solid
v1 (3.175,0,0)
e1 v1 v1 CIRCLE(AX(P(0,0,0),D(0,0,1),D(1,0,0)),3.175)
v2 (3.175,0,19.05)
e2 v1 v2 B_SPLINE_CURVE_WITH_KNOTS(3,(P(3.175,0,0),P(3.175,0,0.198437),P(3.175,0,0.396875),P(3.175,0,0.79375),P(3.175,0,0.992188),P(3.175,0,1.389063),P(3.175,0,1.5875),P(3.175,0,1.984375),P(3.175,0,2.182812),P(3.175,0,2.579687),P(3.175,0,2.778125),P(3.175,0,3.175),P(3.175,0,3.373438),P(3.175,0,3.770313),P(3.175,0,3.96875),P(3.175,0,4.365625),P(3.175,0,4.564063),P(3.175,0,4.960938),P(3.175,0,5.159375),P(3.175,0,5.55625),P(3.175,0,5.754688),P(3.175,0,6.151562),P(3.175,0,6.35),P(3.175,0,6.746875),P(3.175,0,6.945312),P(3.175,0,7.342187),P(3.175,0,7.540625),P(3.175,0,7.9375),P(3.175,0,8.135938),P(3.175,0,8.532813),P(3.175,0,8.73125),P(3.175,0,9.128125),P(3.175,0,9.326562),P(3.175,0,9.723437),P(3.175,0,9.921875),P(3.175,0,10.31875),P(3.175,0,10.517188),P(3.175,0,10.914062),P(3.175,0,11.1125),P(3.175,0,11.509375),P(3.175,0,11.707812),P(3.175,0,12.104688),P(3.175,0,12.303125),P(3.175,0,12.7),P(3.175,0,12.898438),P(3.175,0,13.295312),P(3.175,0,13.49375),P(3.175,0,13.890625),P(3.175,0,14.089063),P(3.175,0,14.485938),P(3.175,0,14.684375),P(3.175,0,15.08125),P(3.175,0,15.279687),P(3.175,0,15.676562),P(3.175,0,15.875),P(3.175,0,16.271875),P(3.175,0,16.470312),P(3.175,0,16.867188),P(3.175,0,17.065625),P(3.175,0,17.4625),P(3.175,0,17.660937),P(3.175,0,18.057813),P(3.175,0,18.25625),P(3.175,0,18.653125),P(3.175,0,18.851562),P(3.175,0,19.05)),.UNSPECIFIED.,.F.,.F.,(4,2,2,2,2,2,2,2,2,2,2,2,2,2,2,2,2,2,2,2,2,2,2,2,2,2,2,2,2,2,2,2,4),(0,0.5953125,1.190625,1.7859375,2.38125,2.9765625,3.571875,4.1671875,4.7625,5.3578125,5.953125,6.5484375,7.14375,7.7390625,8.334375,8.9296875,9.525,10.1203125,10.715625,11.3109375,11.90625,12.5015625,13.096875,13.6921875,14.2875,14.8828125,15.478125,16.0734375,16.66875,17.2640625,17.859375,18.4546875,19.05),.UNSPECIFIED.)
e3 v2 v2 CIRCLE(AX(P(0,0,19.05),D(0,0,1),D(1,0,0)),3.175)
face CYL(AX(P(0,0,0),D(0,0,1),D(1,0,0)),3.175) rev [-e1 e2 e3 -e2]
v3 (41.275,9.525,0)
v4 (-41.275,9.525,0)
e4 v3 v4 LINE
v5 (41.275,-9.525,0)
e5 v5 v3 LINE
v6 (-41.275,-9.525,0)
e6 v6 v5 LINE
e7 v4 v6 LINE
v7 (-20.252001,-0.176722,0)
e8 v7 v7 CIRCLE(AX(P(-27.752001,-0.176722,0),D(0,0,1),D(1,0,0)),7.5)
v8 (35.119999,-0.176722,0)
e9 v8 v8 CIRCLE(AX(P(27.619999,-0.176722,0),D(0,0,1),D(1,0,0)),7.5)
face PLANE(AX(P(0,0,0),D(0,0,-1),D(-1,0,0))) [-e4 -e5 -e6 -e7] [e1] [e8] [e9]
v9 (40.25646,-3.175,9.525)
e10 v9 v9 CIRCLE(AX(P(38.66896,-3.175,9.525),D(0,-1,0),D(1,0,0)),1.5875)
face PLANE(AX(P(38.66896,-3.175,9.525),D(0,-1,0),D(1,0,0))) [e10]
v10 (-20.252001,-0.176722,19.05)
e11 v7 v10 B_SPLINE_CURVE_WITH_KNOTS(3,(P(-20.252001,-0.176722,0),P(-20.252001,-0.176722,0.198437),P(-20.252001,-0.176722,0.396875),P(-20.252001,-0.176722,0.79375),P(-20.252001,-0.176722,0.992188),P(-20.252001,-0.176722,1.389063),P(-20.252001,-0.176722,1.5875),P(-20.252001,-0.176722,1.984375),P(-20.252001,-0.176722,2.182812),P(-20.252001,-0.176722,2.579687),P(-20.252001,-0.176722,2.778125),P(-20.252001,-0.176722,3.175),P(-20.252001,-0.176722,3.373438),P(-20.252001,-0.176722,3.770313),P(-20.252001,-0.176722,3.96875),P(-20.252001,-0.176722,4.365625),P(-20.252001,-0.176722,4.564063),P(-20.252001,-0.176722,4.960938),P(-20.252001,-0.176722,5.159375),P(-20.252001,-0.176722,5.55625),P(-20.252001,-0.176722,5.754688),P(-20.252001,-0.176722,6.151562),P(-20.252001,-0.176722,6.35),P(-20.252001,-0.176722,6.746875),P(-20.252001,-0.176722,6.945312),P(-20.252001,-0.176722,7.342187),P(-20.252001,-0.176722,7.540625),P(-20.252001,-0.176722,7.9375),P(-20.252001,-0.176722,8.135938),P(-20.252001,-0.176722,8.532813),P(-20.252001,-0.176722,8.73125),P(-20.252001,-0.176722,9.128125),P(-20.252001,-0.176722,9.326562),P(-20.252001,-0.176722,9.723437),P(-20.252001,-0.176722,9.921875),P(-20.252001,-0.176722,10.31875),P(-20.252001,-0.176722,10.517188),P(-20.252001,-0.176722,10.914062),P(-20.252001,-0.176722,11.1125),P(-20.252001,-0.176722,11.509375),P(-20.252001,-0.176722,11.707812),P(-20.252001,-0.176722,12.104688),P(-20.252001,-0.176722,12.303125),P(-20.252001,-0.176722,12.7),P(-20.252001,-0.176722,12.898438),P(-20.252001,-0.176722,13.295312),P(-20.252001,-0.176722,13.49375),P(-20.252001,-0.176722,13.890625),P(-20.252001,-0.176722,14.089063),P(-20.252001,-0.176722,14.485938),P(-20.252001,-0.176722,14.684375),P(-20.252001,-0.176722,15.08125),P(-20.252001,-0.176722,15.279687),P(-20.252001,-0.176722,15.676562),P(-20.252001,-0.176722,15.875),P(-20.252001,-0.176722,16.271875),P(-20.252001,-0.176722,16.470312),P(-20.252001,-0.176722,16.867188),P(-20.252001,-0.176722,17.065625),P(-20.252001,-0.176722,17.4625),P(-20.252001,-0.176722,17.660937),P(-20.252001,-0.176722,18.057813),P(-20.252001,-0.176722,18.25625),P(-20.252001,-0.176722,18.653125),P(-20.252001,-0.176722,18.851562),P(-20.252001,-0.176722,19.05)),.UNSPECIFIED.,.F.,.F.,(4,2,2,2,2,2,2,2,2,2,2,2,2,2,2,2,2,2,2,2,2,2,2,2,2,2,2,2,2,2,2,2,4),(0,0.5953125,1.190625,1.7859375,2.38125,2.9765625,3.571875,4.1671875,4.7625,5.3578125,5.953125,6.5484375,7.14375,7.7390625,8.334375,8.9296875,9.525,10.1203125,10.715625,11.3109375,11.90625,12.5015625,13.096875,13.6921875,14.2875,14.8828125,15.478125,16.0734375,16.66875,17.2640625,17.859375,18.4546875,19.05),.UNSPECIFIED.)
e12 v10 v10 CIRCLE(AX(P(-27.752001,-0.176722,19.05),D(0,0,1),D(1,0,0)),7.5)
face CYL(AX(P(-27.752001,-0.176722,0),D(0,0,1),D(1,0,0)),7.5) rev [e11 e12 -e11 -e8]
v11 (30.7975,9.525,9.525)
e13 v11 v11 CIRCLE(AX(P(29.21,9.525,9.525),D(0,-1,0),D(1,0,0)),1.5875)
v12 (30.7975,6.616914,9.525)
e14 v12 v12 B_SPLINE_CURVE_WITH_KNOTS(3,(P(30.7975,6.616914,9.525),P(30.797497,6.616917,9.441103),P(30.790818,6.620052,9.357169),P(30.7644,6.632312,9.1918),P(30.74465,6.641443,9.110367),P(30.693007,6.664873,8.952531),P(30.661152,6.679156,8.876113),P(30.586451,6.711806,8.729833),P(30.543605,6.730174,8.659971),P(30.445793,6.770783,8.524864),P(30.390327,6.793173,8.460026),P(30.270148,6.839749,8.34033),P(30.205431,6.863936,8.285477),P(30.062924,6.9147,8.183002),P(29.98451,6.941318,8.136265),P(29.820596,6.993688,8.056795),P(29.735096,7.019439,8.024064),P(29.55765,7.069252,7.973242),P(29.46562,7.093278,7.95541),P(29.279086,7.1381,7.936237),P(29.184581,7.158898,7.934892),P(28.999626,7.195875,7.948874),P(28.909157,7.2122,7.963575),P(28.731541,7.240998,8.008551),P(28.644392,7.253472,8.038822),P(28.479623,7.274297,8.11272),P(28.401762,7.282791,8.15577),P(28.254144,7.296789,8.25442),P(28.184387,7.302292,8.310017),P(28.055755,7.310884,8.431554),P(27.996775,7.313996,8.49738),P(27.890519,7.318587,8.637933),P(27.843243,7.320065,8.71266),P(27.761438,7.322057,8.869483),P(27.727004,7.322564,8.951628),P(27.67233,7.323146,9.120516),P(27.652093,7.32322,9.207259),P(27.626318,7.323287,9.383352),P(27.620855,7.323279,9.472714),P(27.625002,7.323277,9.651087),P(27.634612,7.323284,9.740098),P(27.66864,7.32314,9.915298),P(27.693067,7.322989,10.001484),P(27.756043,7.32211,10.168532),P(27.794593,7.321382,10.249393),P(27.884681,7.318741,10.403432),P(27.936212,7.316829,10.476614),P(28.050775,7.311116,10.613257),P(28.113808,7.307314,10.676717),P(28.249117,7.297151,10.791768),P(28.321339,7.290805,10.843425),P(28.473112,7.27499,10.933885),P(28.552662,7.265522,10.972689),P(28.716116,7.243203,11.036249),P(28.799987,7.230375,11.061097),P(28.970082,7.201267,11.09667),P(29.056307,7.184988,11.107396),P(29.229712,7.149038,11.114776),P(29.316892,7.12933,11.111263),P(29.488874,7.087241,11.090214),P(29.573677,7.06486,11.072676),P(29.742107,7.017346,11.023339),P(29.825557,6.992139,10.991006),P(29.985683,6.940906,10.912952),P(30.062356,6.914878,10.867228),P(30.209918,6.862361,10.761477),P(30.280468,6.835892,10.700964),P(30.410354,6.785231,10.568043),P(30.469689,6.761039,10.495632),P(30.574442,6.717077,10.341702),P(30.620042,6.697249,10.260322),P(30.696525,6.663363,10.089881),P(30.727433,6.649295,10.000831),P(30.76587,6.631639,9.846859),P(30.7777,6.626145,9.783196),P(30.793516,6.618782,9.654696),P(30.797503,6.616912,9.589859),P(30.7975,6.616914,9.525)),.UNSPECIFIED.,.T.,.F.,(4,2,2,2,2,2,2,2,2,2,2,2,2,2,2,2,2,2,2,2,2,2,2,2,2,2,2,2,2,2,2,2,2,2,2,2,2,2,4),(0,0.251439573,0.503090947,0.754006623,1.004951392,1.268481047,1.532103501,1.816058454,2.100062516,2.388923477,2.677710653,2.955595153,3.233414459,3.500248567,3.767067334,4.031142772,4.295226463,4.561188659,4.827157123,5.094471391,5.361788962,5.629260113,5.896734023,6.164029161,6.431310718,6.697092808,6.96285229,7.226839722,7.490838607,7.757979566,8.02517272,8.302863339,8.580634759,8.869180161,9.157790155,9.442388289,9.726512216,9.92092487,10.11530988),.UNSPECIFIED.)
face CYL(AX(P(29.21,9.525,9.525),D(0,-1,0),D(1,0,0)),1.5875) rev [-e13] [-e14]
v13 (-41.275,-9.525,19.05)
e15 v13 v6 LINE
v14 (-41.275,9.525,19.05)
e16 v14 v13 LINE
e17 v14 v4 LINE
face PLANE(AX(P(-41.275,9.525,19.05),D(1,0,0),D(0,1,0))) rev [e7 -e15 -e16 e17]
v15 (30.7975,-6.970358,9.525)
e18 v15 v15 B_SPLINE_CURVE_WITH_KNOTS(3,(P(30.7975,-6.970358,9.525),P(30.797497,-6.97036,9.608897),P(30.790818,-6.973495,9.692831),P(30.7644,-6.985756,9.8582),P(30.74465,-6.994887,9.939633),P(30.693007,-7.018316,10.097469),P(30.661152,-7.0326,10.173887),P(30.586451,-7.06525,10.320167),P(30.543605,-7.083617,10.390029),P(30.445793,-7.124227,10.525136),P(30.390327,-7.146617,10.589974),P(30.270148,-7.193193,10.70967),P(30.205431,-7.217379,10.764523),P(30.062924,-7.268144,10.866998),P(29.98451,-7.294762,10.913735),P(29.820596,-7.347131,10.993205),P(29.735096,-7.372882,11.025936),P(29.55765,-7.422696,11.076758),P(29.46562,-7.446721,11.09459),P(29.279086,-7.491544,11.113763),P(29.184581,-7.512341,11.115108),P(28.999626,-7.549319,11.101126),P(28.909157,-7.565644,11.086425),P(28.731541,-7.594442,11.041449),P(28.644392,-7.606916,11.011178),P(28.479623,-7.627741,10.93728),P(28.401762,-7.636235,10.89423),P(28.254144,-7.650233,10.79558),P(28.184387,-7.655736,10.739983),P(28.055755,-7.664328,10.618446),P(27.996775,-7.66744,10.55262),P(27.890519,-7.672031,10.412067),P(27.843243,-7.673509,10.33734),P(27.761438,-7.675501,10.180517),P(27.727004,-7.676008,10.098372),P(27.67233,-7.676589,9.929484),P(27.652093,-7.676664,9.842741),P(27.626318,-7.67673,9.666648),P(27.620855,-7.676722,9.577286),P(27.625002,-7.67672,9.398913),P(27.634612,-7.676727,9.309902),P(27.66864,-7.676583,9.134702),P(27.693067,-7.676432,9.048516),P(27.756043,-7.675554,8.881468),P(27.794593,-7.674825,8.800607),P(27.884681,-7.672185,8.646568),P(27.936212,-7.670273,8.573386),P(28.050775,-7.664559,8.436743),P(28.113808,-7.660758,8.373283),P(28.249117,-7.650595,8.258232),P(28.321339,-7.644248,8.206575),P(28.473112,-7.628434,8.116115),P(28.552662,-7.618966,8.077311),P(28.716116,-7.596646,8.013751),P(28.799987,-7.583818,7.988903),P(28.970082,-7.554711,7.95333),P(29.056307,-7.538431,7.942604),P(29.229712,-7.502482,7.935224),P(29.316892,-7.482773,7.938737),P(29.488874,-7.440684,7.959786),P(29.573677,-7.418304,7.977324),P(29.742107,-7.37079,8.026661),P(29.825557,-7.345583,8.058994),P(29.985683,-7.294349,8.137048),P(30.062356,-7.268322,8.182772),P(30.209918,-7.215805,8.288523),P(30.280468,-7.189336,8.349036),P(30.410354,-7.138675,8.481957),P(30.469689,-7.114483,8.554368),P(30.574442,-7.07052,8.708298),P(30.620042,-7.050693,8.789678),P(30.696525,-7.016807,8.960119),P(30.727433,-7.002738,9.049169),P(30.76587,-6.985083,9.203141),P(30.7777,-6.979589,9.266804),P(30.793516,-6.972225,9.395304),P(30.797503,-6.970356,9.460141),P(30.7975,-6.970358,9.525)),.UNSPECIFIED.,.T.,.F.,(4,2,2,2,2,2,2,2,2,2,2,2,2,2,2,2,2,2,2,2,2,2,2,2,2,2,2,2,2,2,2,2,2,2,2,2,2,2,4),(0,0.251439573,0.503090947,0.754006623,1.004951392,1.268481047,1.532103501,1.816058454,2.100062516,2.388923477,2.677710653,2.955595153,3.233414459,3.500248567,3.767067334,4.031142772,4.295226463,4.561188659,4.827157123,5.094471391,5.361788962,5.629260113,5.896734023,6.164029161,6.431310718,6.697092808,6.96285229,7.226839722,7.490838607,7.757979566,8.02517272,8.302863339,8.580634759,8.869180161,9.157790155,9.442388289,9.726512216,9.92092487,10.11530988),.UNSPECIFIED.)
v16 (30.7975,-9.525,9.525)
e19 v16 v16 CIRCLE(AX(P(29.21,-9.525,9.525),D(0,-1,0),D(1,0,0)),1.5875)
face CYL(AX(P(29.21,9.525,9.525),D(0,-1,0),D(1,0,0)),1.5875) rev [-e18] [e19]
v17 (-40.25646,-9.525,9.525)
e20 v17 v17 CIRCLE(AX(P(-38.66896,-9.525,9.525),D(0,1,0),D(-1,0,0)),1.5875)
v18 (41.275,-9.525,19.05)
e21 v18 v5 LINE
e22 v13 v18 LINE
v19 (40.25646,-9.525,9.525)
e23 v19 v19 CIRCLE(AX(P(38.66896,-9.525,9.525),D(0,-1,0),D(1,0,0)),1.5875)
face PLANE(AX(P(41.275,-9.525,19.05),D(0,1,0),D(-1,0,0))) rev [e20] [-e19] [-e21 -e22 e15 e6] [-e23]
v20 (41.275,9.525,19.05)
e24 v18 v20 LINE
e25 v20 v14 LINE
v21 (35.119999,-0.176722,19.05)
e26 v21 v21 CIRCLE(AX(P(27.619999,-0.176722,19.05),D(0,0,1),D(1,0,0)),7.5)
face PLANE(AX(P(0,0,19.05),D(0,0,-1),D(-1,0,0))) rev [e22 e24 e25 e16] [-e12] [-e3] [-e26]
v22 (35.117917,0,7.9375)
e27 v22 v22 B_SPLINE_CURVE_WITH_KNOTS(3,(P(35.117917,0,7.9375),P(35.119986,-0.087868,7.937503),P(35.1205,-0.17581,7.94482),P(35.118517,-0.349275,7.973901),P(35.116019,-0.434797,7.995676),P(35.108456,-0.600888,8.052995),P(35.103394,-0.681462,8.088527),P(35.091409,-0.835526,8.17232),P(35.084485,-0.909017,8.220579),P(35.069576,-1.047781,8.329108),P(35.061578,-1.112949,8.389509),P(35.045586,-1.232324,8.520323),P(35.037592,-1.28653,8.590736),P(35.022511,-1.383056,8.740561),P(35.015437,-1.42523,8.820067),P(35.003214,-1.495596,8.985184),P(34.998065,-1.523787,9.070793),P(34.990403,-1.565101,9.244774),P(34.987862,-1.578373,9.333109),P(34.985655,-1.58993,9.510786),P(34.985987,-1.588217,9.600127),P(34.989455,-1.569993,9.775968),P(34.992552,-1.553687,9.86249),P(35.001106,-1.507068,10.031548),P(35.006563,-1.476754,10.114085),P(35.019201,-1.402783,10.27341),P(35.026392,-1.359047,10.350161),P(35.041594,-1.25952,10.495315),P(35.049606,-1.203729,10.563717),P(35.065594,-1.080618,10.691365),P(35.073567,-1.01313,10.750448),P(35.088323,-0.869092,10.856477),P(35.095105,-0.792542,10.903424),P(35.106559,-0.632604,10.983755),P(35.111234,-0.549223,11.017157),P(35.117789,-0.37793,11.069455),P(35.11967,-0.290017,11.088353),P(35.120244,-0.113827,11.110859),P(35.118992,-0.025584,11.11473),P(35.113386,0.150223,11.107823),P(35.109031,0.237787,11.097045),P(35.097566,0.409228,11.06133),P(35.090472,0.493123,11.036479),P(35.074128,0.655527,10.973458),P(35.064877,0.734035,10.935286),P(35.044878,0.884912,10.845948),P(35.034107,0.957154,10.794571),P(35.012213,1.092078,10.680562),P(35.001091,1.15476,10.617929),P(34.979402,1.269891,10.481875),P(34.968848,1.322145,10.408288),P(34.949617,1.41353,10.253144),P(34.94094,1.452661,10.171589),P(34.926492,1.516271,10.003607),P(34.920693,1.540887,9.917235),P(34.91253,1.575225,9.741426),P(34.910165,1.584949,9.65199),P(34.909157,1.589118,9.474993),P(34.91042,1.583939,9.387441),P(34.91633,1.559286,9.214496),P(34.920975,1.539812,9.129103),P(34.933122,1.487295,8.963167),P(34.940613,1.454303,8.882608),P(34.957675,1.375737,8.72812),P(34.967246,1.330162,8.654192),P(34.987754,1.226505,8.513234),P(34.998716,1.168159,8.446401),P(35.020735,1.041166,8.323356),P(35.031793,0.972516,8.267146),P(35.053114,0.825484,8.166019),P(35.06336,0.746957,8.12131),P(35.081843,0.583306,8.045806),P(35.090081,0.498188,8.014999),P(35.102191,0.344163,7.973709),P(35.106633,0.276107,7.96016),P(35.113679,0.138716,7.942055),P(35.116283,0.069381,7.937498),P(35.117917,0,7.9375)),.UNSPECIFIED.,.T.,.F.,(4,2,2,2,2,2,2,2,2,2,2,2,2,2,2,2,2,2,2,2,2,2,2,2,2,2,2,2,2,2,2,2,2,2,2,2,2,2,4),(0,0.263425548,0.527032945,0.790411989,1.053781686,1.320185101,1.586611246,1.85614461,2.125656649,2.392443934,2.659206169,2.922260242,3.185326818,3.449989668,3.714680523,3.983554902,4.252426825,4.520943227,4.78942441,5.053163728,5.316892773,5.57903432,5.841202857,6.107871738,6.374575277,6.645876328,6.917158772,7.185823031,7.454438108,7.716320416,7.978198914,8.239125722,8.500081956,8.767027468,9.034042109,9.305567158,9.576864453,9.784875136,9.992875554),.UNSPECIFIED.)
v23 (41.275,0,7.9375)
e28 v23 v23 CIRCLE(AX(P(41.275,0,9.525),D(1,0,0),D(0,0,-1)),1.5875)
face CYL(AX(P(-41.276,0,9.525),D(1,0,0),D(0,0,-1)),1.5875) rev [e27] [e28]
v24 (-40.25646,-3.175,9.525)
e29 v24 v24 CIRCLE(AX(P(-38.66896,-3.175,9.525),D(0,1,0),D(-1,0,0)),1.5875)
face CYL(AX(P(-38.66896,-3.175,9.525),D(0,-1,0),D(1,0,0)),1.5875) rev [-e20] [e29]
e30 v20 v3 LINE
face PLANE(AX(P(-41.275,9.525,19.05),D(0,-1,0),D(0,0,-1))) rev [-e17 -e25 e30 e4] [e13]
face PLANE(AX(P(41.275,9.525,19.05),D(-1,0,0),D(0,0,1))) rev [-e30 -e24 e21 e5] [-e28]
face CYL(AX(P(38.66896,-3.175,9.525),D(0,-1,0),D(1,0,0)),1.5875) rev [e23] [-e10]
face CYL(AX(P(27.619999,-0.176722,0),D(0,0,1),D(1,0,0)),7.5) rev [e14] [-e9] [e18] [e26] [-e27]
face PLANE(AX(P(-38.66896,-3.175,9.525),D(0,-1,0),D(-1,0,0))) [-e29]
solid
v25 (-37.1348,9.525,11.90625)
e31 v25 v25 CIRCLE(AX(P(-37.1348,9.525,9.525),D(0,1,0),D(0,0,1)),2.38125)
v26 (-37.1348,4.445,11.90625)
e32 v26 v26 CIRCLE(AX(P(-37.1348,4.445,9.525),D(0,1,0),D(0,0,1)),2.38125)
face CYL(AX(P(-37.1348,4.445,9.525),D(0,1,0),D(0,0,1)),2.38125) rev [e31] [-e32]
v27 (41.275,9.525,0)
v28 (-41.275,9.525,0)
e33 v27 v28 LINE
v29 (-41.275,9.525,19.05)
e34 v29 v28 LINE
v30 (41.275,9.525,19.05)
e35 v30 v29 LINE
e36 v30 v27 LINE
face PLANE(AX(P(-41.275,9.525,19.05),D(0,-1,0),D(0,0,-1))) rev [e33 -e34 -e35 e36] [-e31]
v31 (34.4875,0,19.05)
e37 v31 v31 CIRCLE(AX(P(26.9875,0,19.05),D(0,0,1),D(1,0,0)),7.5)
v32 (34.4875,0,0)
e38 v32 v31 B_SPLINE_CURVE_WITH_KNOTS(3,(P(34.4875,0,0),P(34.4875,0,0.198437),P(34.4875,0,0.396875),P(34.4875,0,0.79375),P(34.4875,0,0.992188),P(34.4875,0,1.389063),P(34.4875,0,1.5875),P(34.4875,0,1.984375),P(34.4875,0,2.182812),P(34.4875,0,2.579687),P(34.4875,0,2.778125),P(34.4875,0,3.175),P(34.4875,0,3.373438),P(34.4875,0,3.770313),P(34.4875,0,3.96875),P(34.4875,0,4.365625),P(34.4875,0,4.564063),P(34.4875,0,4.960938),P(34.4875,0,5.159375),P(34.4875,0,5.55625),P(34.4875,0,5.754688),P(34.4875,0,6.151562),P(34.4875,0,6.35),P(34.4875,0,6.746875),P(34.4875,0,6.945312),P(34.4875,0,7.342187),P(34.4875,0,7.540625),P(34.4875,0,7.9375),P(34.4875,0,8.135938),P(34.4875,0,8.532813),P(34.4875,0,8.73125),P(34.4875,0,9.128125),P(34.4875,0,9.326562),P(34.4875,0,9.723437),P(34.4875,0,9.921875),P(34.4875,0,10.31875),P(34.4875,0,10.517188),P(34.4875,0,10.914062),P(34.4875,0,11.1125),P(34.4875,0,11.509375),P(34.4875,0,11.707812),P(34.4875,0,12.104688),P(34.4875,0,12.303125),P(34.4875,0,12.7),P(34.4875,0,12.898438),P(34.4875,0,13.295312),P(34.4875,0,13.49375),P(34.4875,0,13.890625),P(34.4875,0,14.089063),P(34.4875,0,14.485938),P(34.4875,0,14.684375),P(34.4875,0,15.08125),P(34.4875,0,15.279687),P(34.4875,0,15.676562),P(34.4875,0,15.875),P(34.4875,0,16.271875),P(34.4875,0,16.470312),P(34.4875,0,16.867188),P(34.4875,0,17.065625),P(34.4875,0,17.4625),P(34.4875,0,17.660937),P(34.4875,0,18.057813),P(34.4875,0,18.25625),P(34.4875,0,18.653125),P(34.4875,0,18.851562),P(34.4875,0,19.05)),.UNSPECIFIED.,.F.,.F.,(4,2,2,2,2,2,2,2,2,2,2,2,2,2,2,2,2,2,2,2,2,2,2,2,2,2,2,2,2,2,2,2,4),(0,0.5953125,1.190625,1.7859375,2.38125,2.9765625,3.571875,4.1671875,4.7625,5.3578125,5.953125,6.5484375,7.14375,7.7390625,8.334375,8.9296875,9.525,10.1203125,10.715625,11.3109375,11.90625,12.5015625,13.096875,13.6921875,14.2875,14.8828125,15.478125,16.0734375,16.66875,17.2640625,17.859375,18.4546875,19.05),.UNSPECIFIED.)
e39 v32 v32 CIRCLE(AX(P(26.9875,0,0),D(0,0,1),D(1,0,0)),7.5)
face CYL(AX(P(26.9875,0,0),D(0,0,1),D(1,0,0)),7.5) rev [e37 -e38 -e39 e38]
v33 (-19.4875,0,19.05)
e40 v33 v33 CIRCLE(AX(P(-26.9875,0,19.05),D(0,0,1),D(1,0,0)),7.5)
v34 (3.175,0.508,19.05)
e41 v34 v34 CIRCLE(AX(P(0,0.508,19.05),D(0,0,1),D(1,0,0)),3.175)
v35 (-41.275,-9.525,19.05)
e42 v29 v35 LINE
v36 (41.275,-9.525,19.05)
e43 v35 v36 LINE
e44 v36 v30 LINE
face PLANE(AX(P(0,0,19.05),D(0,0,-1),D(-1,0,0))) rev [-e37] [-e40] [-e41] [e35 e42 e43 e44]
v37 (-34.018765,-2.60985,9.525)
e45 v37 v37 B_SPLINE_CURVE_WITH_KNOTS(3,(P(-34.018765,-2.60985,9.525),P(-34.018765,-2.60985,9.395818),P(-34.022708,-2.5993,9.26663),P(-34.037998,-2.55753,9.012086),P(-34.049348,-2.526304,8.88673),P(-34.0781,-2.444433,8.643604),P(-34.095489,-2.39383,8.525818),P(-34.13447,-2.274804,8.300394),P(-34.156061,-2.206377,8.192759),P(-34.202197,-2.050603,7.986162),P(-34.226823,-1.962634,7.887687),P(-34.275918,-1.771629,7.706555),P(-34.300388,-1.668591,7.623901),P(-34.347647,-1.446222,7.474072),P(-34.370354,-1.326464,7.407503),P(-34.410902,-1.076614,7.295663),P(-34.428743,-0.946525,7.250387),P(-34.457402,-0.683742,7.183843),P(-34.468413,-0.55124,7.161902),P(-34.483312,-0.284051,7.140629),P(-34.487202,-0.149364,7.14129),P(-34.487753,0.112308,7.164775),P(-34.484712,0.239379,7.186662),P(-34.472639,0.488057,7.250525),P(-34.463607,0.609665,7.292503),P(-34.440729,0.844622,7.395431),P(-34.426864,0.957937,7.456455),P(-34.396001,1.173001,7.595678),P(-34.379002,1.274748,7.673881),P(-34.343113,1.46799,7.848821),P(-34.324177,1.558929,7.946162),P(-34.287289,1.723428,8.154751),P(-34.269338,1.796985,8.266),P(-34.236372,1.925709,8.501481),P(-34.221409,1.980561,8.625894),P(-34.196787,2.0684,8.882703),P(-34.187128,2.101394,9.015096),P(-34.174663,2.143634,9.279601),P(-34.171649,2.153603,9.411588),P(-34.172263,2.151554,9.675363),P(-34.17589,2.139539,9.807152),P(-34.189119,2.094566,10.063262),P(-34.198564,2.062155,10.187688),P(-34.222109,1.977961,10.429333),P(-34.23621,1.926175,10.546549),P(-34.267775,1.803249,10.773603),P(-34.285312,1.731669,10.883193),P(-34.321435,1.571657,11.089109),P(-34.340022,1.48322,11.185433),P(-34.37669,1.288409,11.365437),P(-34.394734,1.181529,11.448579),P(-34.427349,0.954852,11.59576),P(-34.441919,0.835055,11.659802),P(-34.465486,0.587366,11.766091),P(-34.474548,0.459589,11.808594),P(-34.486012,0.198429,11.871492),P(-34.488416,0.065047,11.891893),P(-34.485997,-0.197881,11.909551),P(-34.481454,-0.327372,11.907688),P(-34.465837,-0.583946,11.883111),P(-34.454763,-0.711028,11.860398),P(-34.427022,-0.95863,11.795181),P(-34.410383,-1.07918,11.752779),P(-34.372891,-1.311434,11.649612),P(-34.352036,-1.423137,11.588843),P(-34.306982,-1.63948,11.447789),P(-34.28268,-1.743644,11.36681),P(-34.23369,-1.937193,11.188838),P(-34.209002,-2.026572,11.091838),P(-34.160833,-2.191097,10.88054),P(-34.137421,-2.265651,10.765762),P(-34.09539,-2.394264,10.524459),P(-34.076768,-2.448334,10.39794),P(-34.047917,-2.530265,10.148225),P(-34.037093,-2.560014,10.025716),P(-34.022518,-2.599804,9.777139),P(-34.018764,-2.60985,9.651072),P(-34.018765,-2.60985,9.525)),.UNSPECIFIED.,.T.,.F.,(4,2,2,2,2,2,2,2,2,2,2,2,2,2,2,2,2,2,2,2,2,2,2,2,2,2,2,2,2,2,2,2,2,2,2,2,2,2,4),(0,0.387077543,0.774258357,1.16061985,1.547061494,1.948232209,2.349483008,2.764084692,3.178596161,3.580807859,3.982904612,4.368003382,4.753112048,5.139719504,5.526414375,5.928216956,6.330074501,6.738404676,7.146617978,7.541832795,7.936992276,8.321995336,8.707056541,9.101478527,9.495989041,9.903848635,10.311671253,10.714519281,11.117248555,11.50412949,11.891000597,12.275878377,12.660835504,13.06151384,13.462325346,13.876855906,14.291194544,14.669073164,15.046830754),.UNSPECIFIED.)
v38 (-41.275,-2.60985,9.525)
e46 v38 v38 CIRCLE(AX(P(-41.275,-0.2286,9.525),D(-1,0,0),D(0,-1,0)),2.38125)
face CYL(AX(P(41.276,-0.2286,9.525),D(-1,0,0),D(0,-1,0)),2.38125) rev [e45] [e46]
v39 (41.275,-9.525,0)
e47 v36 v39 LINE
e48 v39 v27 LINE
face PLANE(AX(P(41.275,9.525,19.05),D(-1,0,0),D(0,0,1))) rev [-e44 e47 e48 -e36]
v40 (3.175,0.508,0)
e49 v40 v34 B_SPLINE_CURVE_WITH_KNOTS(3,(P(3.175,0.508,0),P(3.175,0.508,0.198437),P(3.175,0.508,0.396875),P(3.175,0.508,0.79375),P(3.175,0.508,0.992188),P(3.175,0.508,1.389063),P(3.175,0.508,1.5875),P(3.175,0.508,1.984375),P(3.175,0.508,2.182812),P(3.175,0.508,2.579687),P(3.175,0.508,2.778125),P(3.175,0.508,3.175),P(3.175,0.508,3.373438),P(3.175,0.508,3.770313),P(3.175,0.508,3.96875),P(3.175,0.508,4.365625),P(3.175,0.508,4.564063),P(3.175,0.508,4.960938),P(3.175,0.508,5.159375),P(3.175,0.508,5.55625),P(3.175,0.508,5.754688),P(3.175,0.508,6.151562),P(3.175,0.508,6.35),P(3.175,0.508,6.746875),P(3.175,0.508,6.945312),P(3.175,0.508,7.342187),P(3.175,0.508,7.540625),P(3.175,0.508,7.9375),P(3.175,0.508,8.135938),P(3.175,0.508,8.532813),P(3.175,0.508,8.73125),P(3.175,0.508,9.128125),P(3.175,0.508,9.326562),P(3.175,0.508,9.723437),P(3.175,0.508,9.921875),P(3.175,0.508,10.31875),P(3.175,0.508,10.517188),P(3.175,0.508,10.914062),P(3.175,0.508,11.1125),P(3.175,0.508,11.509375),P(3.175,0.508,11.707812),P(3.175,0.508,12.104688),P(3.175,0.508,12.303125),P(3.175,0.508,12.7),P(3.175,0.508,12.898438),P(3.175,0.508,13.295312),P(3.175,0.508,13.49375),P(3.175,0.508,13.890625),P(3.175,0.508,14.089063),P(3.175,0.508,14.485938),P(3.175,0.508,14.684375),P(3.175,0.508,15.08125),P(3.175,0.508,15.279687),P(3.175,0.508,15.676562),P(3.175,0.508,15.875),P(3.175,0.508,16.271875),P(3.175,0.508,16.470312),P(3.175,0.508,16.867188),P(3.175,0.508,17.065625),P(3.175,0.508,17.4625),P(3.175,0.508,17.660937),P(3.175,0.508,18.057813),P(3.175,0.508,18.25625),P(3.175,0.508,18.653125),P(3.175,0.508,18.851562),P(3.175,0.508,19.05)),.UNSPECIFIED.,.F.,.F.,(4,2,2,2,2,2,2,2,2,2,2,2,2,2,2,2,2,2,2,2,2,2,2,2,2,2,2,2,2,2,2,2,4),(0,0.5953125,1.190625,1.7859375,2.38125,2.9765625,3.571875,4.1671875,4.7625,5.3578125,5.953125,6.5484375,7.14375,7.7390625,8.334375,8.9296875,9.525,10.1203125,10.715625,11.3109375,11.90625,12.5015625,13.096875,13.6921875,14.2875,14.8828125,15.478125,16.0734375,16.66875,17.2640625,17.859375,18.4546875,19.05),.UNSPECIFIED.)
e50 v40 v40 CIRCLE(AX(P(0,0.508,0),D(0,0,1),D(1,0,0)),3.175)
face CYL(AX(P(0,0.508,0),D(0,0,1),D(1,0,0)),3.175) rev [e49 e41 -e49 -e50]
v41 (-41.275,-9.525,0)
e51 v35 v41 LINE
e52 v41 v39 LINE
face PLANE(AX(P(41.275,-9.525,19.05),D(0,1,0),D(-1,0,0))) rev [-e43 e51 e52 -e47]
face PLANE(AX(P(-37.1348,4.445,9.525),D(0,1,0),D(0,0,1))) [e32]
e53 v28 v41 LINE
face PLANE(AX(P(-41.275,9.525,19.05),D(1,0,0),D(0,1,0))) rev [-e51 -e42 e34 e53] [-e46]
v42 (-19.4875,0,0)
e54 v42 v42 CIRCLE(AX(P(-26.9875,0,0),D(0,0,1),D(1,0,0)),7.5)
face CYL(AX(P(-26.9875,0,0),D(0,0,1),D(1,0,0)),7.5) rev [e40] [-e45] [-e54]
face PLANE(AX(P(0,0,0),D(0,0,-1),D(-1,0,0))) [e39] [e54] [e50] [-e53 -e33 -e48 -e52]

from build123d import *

# Parameters (mm, degrees)
BOSS_EXTRUDE1_OUTLINE_W     = 82.55
BOSS_EXTRUDE1_OUTLINE_H     = 19.05
BOSS_EXTRUDE1_DEPTH         = 19.05
BOSS_EXTRUDE1_START         = -9.525
BOSS_EXTRUDE1_2_OUTLINE_W   = 82.55
BOSS_EXTRUDE1_2_OUTLINE_H   = 19.05
BOSS_EXTRUDE1_2_OUTLINE_R   = 1.5875
BOSS_EXTRUDE1_2_DEPTH       = 19.05
BOSS_EXTRUDE1_START_2       = -3.175
BOSS_EXTRUDE1_3_OUTLINE_R   = 1.5875
BOSS_EXTRUDE1_3_DEPTH       = 12.7
BOSS_EXTRUDE1_4_OUTLINE_R   = 3.175
BOSS_EXTRUDE1_4_OUTLINE_R_2 = 7.5
BOSS_EXTRUDE1_4_DEPTH       = 19.05
BOSS_EXTRUDE1_START_3       = 34
BOSS_EXTRUDE1_5_OUTLINE_R   = 1.5875
BOSS_EXTRUDE1_5_DEPTH       = 7.275
SKETCH2_R                   = 3.175
CUT_EXTRUDE1_DEPTH          = 47.446245962
SKETCH4_R                   = 7.5
CUT_EXTRUDE3_DEPTH          = 47.446245962
SKETCH29_R                  = 2.38125
CUT_EXTRUDE5_DEPTH          = 5.08
CUT_EXTRUDE7_REACH          = 87.253
CUT_EXTRUDE7_END_RADIUS     = 7.5
SKETCH51_R                  = 2.38125


with BuildPart() as part:
    # Boss-Extrude1: read off the stored shape, not the designer's step
    # Boss-Extrude1 outline → Boss-Extrude1 (new body)
    with BuildSketch(Plane.XY):
        Rectangle(BOSS_EXTRUDE1_OUTLINE_W, BOSS_EXTRUDE1_OUTLINE_H)
    extrude(amount=BOSS_EXTRUDE1_DEPTH)

    # Sketch2 → Cut-Extrude1 (cut, through all)
    with BuildSketch(Plane.XY.offset(19.05)):
        with Locations((0, 0.508)):
            Circle(SKETCH2_R)
    extrude(amount=-CUT_EXTRUDE1_DEPTH, mode=Mode.SUBTRACT)

    # Sketch4 → Cut-Extrude3 (cut, through all)
    with BuildSketch(Plane.XY.offset(19.05)):
        with Locations((-26.9875, 0)):
            Circle(SKETCH4_R)
        with Locations((26.9875, 0)):
            Circle(SKETCH4_R)
    extrude(amount=-CUT_EXTRUDE3_DEPTH, mode=Mode.SUBTRACT)

    # Sketch29 → Cut-Extrude5 (cut)
    with BuildSketch(Plane(origin=(0, 9.525, 0), x_dir=(1, 0, 0), z_dir=(0, 1, 0))):
        with Locations(Location((-37.1348, -9.525, 0), (0, 0, 270))):
            Circle(SKETCH29_R)
    extrude(amount=-CUT_EXTRUDE5_DEPTH, mode=Mode.SUBTRACT)

    # Cut-Extrude7: up to this cylinder (the profile starts outside it)
    cut_extrude7_end = Plane(origin=(-26.9875, 0, 9.525), z_dir=(0, 0, 1)) * Cylinder(CUT_EXTRUDE7_END_RADIUS, 190.506, mode=Mode.PRIVATE)
    # Sketch51 → Cut-Extrude7 (cut, up to the surface)
    with BuildSketch(Plane.ZY.offset(41.275), mode=Mode.PRIVATE) as cut_extrude7_sk1:
        with Locations(Location((9.525, -0.2286, 0), (0, 0, 270))):
            Circle(SKETCH51_R)
    cut_extrude7_tool1 = extrude(cut_extrude7_sk1.sketch, amount=-CUT_EXTRUDE7_REACH, mode=Mode.PRIVATE) - cut_extrude7_end
    add(cut_extrude7_tool1.solids().sort_by_distance((-41.275, -0.2286, 9.525))[0], mode=Mode.SUBTRACT)


with BuildPart() as body_2:
    # Boss-Extrude1 2 outline → Boss-Extrude1 2 (new body)
    with BuildSketch(Plane(origin=(0, 0, 0), x_dir=(1, 0, 0), z_dir=(0, 1, 0)).offset(BOSS_EXTRUDE1_START)):
        with Locations((0, -9.525)):
            Rectangle(BOSS_EXTRUDE1_2_OUTLINE_W, BOSS_EXTRUDE1_2_OUTLINE_H)
        with Locations((-38.66896, -9.525)):
            Circle(BOSS_EXTRUDE1_2_OUTLINE_R, mode=Mode.SUBTRACT)
        with Locations((29.21, -9.525)):
            Circle(BOSS_EXTRUDE1_2_OUTLINE_R, mode=Mode.SUBTRACT)
        with Locations((38.66896, -9.525)):
            Circle(BOSS_EXTRUDE1_2_OUTLINE_R, mode=Mode.SUBTRACT)
    extrude(amount=BOSS_EXTRUDE1_2_DEPTH)

    # Boss-Extrude1 3 outline → Boss-Extrude1 3 (add)
    with BuildSketch(Plane(origin=(0, 0, 0), x_dir=(1, 0, 0), z_dir=(0, 1, 0)).offset(BOSS_EXTRUDE1_START_2)):
        with Locations((38.66896, -9.525)):
            Circle(BOSS_EXTRUDE1_3_OUTLINE_R)
        with Locations((-38.66896, -9.525)):
            Circle(BOSS_EXTRUDE1_3_OUTLINE_R)
    extrude(amount=BOSS_EXTRUDE1_3_DEPTH)

    # Boss-Extrude1 4 outline → Boss-Extrude1 4 (cut)
    with BuildSketch(Plane.XY):
        Circle(BOSS_EXTRUDE1_4_OUTLINE_R)
        with Locations((27.619999315, -0.176721762)):
            Circle(BOSS_EXTRUDE1_4_OUTLINE_R_2)
        with Locations((-27.752000685, -0.176721762)):
            Circle(BOSS_EXTRUDE1_4_OUTLINE_R_2)
    extrude(amount=BOSS_EXTRUDE1_4_DEPTH, mode=Mode.SUBTRACT)

    # Boss-Extrude1 5 outline → Boss-Extrude1 5 (cut)
    with BuildSketch(Plane.YZ.offset(BOSS_EXTRUDE1_START_3)):
        with Locations((0, 9.525)):
            Circle(BOSS_EXTRUDE1_5_OUTLINE_R)
    extrude(amount=BOSS_EXTRUDE1_5_DEPTH, mode=Mode.SUBTRACT)


solid = Compound([part.part, body_2.part])
